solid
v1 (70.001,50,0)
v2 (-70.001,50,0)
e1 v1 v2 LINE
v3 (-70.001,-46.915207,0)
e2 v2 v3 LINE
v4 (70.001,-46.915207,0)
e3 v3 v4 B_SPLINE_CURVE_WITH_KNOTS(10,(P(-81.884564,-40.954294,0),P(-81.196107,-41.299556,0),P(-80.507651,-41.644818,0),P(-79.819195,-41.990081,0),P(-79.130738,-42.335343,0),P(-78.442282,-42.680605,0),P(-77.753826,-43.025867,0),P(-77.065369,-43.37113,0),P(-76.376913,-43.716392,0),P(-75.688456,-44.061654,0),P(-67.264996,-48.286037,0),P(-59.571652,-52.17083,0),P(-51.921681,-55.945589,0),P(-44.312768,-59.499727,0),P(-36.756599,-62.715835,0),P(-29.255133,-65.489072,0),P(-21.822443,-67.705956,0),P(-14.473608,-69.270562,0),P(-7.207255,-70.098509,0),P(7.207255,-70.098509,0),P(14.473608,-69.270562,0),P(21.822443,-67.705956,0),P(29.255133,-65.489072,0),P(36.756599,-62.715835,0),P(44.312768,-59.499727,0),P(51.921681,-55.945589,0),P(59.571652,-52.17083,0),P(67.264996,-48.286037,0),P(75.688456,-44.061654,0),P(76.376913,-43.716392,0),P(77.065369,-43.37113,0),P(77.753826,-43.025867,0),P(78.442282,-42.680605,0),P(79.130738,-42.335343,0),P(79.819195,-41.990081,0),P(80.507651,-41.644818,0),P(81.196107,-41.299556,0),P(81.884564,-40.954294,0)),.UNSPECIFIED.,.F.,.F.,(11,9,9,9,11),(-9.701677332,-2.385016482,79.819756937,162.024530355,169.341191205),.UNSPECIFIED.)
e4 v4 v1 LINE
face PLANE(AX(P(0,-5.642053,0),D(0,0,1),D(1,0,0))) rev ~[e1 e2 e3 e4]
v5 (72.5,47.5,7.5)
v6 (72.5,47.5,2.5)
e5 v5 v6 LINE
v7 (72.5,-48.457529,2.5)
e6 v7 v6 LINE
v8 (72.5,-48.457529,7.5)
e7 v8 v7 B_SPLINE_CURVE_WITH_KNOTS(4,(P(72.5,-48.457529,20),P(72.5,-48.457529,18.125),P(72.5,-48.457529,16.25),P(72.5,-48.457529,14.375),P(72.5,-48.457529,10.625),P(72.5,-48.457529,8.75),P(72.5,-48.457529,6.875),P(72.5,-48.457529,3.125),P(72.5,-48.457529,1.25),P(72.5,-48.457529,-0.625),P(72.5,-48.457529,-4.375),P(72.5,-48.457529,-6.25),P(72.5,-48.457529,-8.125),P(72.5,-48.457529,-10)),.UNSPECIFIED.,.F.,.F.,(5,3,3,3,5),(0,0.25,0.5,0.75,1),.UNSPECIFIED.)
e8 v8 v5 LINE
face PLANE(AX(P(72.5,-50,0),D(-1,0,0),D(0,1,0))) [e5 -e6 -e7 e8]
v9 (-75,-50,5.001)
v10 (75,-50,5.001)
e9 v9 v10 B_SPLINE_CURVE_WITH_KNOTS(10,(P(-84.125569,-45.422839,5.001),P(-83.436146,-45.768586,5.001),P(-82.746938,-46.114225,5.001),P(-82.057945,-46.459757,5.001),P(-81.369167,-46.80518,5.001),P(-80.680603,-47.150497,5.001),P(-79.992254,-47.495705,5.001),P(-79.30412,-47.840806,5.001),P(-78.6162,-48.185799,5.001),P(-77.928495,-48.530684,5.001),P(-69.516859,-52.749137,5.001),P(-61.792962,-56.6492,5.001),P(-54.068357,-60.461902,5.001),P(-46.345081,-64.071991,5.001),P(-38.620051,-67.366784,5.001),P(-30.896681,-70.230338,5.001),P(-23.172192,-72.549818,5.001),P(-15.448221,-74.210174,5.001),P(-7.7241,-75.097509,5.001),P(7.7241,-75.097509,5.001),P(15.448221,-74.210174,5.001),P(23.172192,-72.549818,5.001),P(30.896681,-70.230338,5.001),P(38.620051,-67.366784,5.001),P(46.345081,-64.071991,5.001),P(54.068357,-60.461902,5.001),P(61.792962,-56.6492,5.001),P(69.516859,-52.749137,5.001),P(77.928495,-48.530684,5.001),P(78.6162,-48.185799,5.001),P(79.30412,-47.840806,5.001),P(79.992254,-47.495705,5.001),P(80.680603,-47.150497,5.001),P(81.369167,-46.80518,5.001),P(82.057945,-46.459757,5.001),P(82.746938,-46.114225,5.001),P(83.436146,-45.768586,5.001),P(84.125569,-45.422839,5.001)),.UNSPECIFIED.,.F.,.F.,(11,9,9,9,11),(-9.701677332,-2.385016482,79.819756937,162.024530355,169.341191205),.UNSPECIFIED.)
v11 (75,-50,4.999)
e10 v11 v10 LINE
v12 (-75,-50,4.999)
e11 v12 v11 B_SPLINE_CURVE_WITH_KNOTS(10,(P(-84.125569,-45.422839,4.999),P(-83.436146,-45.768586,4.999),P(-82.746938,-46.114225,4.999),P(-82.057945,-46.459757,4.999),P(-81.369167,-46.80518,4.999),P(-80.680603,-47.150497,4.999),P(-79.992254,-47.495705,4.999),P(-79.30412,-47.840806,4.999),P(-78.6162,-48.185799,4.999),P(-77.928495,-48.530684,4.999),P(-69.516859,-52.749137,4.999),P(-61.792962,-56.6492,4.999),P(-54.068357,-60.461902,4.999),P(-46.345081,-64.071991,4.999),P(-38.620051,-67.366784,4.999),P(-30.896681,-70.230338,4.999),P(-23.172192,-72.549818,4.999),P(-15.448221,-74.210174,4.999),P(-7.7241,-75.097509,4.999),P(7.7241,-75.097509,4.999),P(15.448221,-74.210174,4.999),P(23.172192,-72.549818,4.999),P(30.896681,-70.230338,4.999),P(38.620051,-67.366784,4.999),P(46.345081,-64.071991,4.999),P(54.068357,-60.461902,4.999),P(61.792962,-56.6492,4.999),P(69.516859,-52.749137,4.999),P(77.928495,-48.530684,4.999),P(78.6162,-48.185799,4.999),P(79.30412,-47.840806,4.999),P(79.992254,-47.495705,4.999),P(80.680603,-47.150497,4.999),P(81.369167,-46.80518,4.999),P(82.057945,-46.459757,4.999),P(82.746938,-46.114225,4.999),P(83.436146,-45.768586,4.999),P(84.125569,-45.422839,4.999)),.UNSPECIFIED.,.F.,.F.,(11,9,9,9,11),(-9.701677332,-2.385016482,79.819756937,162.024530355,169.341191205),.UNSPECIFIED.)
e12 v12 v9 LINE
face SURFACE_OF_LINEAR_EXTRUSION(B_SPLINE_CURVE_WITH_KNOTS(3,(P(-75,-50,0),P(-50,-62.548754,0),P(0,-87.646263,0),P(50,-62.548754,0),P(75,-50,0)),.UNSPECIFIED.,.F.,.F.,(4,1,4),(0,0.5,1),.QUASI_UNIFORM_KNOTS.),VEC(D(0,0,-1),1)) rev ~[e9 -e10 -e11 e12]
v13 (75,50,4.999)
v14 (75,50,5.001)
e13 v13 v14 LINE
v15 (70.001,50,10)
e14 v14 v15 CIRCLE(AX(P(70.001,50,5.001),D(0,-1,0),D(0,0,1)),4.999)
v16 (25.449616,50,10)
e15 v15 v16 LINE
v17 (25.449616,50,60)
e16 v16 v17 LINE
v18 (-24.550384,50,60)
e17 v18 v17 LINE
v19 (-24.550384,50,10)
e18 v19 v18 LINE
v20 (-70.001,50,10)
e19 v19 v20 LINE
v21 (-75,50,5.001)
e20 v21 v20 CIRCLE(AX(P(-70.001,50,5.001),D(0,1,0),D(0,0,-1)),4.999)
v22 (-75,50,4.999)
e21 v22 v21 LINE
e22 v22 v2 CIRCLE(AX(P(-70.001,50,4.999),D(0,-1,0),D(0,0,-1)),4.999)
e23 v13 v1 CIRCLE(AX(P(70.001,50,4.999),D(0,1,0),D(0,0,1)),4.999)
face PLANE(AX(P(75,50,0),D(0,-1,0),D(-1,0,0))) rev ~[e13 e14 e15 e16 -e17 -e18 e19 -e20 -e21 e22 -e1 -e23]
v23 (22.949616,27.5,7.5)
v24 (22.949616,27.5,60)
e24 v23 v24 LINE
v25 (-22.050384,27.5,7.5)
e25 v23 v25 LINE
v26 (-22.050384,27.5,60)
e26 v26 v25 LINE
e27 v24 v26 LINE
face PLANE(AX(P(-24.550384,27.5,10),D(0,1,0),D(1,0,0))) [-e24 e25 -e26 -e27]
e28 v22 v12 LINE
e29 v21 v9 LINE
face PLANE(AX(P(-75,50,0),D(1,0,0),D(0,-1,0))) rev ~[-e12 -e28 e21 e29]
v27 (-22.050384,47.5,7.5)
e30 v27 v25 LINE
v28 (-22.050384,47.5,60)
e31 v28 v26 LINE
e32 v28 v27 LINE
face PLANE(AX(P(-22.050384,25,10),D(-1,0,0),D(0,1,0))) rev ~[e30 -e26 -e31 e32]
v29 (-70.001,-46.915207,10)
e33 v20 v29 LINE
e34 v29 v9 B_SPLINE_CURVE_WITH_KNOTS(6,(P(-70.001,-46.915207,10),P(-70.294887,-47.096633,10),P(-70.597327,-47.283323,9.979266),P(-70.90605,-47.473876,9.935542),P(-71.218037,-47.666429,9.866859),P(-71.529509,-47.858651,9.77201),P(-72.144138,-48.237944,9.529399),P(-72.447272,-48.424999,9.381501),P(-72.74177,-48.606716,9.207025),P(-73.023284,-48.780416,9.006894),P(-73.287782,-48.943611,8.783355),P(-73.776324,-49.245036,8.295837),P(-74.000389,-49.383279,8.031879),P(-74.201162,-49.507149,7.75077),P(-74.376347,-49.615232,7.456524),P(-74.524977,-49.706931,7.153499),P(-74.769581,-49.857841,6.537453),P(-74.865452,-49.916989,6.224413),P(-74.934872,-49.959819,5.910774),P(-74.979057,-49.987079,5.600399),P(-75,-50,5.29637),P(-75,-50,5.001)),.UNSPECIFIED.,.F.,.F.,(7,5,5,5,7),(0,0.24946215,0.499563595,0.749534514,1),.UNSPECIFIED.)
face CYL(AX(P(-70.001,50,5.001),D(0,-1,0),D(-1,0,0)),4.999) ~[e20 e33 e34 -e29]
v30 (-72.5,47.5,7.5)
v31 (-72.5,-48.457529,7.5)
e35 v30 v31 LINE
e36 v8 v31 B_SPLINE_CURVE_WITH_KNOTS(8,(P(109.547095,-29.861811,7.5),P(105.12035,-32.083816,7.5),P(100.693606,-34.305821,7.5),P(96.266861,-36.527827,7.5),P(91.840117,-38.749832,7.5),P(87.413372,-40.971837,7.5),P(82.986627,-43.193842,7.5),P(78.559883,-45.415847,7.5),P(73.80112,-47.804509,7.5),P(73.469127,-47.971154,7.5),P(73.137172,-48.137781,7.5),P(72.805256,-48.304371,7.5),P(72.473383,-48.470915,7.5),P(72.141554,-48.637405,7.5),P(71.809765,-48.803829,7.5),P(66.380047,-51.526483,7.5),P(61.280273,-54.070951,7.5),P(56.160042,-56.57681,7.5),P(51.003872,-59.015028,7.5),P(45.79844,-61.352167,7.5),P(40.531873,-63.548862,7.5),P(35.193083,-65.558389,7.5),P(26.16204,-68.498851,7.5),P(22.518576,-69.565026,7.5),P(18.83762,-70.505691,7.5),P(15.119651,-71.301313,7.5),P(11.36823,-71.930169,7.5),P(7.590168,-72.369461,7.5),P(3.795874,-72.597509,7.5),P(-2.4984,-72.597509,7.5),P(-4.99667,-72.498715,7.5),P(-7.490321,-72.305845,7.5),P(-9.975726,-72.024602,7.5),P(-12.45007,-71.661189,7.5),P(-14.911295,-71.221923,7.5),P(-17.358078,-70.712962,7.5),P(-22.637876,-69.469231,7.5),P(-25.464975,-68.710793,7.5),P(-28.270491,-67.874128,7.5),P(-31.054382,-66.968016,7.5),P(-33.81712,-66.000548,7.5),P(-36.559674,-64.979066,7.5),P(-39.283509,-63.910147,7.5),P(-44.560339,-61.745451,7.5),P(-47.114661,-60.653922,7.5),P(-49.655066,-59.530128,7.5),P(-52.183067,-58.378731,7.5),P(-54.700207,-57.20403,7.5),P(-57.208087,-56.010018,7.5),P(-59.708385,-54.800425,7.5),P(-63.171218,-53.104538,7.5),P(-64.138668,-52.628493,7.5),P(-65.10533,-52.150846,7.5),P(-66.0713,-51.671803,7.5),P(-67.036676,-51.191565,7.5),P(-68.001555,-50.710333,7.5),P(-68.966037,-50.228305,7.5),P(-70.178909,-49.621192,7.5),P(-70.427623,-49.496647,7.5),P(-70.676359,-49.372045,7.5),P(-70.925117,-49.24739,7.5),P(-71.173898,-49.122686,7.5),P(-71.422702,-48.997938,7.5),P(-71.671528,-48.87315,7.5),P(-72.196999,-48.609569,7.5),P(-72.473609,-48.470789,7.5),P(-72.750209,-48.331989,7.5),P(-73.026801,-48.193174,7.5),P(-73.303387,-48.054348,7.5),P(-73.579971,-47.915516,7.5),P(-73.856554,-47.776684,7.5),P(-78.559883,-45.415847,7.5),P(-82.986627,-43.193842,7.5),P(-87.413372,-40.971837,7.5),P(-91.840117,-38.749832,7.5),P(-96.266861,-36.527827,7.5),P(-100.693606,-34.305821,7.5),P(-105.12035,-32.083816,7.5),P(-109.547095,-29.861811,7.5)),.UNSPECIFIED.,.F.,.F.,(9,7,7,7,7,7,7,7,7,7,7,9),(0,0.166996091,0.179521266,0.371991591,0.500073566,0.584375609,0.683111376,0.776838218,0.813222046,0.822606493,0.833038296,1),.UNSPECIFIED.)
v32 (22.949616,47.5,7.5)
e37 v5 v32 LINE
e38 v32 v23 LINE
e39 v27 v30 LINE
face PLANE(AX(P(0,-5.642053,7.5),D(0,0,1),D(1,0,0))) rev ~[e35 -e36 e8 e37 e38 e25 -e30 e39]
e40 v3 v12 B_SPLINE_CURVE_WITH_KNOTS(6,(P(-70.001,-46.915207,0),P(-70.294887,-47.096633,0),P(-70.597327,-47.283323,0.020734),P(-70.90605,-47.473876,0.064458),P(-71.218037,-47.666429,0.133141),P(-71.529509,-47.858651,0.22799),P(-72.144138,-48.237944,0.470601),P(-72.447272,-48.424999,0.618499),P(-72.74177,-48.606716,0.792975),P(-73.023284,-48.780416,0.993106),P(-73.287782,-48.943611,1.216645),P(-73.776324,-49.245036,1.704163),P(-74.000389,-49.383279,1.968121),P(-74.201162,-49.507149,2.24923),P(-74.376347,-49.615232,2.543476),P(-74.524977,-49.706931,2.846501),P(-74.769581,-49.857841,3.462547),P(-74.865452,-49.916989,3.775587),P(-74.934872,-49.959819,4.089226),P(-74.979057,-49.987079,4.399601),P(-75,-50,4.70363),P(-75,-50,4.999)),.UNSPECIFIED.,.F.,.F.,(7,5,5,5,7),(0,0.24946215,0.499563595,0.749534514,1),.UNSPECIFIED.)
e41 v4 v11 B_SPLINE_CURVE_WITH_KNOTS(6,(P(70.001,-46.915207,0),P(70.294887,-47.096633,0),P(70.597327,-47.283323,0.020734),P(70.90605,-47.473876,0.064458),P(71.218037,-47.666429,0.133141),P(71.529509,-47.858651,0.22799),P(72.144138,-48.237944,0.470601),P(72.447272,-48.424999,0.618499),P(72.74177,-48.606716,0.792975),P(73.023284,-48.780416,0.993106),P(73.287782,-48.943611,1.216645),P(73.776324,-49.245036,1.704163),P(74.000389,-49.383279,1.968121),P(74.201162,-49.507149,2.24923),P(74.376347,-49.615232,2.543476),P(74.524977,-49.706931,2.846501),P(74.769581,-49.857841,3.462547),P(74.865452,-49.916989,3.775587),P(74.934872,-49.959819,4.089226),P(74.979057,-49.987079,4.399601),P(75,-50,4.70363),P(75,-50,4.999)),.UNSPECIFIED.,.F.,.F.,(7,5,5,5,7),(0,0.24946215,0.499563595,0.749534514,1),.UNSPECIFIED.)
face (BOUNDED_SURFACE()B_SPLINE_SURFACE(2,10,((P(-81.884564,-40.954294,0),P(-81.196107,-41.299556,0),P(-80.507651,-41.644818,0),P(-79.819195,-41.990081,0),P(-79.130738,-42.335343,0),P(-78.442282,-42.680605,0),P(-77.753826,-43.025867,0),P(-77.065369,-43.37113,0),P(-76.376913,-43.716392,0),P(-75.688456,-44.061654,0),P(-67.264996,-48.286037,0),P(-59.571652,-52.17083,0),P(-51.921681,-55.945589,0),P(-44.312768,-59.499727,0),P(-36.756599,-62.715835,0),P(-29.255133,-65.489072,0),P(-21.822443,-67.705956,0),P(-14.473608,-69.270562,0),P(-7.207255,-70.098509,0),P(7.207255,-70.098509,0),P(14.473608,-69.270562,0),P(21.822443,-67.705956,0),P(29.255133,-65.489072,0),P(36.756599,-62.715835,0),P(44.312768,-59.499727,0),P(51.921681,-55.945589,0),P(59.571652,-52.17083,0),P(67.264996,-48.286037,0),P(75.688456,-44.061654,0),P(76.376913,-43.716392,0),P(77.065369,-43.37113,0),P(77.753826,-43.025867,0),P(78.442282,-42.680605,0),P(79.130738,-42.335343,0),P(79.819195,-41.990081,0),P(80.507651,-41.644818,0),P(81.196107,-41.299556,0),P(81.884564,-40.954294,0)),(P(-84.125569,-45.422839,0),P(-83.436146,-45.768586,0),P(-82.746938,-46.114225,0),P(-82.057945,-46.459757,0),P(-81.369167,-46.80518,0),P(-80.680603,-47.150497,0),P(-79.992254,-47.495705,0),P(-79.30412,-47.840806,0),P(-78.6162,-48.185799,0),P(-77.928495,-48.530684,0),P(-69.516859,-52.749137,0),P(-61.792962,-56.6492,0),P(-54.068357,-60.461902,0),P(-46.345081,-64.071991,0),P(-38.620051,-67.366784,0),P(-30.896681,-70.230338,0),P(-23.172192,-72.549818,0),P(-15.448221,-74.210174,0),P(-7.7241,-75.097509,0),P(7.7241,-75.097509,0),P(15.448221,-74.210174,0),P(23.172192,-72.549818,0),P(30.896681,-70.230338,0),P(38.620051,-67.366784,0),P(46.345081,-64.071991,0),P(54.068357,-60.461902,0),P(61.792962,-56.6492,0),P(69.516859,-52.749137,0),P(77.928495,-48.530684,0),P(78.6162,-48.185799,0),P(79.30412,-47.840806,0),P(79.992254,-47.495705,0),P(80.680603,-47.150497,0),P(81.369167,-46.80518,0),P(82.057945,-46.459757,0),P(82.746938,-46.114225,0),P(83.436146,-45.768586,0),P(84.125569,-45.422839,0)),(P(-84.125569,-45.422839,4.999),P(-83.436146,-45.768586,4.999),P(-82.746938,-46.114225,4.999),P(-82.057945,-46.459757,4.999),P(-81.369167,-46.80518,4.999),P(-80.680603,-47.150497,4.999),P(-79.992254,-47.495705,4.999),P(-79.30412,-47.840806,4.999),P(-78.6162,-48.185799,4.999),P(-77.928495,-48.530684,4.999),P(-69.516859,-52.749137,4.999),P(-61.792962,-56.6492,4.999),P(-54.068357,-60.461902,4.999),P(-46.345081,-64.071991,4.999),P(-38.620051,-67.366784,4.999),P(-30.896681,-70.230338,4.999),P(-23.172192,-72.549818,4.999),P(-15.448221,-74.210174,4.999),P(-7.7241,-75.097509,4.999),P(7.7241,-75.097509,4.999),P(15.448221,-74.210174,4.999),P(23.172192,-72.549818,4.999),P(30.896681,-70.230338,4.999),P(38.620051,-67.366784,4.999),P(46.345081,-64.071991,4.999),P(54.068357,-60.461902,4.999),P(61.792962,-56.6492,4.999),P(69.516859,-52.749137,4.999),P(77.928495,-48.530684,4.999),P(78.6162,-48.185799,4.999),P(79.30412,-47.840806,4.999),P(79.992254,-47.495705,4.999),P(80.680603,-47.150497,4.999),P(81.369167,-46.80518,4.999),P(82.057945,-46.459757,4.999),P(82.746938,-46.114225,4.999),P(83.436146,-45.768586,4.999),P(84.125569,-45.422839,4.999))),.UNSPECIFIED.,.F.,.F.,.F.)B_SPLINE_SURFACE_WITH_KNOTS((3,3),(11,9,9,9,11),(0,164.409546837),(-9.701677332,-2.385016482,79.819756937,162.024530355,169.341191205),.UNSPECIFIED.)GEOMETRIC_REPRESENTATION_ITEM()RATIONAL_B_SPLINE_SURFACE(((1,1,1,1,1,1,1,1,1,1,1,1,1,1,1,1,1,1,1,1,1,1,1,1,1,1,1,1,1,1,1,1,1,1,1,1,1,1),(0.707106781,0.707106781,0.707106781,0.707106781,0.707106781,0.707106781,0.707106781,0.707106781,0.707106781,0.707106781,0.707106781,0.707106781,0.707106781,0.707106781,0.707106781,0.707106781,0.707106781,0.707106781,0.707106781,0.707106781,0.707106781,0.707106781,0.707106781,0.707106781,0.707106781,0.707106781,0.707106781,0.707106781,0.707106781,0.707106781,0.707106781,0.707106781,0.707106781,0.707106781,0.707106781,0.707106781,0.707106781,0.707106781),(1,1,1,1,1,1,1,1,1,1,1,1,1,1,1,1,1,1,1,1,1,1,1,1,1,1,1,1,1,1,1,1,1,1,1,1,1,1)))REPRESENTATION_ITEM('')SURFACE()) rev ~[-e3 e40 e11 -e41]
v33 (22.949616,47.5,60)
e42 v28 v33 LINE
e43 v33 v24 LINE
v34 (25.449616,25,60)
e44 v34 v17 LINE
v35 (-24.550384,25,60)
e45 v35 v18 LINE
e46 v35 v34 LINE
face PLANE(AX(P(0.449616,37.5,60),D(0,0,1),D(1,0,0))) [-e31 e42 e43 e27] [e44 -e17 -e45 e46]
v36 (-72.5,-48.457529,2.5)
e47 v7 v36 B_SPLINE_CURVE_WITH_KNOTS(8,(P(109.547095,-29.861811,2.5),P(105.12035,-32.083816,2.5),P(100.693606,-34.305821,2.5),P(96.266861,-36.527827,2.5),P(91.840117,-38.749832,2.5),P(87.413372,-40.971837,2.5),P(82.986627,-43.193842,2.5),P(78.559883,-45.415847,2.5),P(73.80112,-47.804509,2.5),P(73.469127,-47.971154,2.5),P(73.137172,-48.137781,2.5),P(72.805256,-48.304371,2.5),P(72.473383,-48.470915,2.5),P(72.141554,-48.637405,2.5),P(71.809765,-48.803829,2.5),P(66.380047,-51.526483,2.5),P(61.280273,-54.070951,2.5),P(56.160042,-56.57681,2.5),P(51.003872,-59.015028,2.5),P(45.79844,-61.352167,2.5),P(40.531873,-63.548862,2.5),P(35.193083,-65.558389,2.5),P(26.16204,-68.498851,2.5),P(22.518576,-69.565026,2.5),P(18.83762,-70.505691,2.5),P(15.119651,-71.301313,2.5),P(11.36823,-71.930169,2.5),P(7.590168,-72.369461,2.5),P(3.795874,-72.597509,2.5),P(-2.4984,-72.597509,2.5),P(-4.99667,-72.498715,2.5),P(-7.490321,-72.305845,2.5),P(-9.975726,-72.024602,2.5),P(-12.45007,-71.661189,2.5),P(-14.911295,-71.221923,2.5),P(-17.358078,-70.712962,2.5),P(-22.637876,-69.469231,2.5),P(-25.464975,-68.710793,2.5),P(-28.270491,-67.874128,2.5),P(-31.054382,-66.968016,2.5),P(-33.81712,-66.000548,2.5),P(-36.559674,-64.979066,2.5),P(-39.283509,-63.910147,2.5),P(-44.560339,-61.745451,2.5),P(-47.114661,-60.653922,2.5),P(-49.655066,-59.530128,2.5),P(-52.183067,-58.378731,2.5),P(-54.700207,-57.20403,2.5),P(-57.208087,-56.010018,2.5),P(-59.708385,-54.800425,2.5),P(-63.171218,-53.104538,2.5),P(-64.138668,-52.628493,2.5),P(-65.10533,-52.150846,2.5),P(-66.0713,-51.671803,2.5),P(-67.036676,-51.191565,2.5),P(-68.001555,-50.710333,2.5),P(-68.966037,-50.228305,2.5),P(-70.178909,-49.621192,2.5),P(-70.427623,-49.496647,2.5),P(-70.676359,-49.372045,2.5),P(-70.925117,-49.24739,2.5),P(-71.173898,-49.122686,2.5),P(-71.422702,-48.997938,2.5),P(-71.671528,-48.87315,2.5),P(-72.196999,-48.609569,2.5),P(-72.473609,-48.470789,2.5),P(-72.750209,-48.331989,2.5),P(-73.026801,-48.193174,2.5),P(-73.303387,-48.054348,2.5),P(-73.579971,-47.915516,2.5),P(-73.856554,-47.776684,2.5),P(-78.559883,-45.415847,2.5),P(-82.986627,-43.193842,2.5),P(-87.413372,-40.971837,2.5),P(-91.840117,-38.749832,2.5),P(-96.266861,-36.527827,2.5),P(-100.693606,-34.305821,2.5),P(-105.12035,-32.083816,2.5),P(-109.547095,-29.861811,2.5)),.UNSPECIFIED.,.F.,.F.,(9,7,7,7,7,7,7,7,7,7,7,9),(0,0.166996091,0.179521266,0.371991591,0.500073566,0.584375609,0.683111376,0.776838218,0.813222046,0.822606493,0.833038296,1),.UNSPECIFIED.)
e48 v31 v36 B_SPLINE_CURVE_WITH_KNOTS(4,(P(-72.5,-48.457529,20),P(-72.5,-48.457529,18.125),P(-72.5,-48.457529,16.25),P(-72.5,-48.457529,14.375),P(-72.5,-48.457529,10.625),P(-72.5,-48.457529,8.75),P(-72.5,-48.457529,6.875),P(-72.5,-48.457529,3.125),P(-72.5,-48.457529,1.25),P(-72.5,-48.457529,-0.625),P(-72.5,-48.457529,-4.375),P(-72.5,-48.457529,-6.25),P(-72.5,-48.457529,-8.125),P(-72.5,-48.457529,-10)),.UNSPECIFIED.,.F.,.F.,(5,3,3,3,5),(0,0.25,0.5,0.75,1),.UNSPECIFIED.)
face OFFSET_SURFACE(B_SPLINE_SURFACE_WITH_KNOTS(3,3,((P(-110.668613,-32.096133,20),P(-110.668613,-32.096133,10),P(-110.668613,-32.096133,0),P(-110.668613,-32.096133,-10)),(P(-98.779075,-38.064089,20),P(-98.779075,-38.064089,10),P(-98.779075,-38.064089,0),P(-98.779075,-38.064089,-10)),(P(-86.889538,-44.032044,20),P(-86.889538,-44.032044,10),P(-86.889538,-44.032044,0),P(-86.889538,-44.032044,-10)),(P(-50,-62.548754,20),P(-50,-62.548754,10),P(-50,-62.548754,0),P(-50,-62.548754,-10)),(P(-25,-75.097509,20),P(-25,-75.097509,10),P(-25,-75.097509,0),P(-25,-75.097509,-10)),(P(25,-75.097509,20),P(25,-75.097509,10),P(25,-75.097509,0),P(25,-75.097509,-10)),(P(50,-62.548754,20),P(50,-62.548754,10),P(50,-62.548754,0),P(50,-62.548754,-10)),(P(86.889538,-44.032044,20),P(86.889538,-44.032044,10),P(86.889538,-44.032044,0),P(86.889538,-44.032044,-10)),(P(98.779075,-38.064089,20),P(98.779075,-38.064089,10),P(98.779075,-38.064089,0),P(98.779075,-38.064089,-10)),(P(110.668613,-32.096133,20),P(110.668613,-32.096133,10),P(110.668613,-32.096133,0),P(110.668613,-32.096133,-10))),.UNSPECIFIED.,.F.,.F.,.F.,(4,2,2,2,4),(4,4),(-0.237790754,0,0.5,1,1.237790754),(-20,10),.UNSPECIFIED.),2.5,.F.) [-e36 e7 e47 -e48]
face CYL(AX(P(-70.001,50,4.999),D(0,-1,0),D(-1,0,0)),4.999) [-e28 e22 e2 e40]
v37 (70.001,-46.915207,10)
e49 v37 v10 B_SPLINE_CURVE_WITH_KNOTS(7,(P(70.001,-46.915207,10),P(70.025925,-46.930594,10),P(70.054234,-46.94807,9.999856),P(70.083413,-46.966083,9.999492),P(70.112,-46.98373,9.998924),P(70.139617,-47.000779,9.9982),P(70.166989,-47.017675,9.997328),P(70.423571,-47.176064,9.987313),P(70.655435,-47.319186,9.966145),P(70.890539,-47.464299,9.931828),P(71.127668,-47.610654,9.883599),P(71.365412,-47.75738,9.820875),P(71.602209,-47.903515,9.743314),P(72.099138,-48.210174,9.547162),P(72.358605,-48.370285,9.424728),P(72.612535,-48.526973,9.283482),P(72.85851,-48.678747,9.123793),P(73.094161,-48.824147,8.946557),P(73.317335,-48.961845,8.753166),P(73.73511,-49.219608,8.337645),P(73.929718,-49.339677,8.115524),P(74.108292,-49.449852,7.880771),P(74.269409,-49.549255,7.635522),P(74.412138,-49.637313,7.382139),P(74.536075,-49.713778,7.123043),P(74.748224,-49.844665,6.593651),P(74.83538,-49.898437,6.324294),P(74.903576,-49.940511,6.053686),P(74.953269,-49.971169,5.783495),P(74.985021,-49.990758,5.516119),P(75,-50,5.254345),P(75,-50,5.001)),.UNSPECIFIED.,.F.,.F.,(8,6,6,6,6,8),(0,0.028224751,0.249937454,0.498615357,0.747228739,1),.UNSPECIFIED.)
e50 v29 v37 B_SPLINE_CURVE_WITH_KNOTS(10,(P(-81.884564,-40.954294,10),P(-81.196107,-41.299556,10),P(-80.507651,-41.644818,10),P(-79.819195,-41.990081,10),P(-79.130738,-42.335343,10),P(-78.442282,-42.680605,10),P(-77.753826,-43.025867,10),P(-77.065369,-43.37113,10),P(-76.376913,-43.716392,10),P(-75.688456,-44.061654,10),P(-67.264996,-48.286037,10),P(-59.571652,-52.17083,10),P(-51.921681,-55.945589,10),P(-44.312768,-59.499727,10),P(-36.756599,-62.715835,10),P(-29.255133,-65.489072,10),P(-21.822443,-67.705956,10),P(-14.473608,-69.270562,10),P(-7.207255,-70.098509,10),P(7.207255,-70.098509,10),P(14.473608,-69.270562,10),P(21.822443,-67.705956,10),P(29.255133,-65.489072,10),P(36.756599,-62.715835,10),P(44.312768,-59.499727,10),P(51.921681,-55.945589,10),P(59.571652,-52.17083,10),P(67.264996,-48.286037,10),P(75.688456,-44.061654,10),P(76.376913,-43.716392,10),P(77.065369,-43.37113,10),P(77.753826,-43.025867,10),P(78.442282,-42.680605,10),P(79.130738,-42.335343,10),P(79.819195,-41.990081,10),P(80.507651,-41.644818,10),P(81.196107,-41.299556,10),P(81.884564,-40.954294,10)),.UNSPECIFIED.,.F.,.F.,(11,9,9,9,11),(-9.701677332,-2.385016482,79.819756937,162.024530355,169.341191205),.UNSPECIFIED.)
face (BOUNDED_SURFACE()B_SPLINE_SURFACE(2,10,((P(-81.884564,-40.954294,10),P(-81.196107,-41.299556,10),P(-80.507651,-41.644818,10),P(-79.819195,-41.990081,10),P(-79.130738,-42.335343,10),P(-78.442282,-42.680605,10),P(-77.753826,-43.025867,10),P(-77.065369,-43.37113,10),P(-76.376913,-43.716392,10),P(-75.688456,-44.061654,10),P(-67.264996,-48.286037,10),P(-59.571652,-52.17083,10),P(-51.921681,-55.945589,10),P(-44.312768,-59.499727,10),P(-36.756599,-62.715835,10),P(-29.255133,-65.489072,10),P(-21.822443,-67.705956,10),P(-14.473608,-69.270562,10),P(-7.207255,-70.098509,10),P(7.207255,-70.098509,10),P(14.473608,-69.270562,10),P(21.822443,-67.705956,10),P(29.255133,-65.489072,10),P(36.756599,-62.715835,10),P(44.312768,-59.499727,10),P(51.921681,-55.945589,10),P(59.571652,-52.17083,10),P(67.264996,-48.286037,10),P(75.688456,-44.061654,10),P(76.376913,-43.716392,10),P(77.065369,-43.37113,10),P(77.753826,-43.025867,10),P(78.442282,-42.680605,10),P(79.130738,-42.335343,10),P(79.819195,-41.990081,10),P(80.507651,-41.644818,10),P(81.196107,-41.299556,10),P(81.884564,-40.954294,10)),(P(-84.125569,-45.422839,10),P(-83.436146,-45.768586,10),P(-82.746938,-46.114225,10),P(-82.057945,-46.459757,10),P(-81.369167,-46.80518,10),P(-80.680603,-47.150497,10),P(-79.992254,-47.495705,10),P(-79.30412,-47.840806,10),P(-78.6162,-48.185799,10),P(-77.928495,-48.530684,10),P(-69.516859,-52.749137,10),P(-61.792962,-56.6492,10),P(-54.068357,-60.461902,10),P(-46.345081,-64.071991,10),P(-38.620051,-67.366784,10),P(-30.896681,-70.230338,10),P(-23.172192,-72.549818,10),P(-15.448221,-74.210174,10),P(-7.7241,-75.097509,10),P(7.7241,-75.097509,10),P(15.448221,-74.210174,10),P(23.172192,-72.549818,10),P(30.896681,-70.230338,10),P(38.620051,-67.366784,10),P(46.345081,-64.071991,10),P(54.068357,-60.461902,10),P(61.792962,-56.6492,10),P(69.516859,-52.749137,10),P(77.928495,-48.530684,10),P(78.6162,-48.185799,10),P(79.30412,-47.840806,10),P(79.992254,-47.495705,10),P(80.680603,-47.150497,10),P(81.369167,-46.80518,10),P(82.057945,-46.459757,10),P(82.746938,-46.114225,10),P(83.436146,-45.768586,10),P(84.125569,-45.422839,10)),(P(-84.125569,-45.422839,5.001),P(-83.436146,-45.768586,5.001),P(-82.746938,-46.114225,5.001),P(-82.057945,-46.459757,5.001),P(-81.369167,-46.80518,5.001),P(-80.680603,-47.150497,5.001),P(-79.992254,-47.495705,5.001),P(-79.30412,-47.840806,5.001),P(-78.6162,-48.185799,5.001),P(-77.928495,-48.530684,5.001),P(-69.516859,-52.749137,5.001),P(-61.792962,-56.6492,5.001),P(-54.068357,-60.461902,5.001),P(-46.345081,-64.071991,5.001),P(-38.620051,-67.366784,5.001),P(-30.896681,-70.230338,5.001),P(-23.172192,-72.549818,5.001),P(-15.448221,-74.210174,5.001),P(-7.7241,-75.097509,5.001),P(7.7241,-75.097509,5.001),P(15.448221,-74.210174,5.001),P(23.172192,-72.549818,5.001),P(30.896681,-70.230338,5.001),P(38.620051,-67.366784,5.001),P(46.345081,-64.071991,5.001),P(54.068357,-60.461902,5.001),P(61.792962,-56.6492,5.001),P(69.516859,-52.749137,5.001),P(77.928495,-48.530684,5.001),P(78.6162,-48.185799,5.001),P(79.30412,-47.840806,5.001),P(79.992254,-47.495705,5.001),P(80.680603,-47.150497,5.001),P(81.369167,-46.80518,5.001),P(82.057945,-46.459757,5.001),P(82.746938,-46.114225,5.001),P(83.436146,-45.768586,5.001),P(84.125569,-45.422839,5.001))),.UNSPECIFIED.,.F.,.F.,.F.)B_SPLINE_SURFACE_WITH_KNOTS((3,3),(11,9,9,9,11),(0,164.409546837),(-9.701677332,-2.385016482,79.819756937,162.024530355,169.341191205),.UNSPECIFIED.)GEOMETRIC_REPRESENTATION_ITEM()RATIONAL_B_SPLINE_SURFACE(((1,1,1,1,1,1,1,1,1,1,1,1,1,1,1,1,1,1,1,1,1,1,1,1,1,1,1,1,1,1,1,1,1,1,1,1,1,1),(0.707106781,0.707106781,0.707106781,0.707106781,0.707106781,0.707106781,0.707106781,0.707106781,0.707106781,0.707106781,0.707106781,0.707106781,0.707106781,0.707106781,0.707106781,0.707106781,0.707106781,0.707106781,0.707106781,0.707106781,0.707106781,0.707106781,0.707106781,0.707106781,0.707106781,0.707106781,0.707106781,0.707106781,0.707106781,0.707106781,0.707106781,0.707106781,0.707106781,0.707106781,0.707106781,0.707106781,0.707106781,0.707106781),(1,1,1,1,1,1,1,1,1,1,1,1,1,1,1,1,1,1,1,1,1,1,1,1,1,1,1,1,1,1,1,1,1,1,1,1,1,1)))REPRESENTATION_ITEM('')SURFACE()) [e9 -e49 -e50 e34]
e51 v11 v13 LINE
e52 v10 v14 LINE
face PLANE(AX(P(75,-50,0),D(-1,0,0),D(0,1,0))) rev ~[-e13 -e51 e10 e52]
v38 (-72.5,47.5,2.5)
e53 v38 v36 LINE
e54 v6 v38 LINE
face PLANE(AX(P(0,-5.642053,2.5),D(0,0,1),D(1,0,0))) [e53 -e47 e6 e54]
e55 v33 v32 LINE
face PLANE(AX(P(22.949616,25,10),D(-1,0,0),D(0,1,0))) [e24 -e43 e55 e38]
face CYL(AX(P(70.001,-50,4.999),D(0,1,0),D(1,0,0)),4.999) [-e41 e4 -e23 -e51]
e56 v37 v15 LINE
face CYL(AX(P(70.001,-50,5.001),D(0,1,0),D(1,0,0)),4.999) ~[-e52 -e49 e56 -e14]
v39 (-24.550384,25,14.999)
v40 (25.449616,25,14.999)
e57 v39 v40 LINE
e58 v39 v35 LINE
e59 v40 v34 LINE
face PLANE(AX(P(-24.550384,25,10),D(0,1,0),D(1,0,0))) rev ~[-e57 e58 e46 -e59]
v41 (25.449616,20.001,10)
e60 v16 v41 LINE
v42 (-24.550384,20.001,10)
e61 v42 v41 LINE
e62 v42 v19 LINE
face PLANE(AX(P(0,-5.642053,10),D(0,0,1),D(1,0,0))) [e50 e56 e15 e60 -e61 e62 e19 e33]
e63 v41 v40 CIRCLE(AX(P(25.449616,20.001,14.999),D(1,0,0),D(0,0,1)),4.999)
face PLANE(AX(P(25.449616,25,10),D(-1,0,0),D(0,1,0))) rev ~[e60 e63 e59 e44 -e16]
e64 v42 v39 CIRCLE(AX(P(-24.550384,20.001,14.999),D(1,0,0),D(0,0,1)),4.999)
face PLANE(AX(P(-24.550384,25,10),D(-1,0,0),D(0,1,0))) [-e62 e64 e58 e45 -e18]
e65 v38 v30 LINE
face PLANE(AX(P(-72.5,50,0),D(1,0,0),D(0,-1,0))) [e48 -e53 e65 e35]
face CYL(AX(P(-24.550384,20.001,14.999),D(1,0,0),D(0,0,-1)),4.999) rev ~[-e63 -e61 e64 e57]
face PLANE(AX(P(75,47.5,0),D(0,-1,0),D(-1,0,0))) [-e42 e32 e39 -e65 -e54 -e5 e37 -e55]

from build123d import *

# Parameters (mm, degrees)
F1_DEPTH = 10
F2_W     = 50
F2_H     = 25
F3_DEPTH = 50
F4_T     = -2.5
F5_R     = 4.999


# Not quite as in the source:
# - a fillet or chamfer is up to 0.001 mm smaller than in the source, because OpenCascade refuses the exact size


with BuildPart() as f1:
    # F0 (on Top) → F1 (new body)
    with BuildSketch(Plane.XY):
        with BuildLine():
            Line((75, 50), (-75, 50))
            Line((-75, 50), (-75, -50))
            add(Edge.make_bspline(
                [(-75, -50), (-50, -62.5487543643), (0, -87.6462630928), (50, -62.5487543643), (75, -50)],
                knots=[0, 0, 0, 0, 0.5, 1, 1, 1, 1], degree=3))
            Line((75, -50), (75, 50))
        make_face()
    extrude(amount=F1_DEPTH)

    # F2 (on face) → F3 (join)
    with BuildSketch(Plane.XY.offset(10)):
        with Locations((0.4496160895, 37.5)):
            Rectangle(F2_W, F2_H)
    extrude(amount=F3_DEPTH)

    # F4
    f4_openings = [f1.faces().sort_by_distance(p)[0] for p in [
        (0.449616, 37.5, 60),
    ]]
    offset(amount=F4_T, openings=f4_openings, kind=Kind.INTERSECTION)

    # F5 (radius 5 in the source; OpenCascade refuses exactly that, so slightly less here)
    f5_edges = [f1.edges().sort_by_distance(p)[0] for p in [
        (0, -75.097509, 10),
        (0, -75.097509, 0),
        (-75, 0, 10),
        (-75, 0, 0),
        (75, 0, 0),
        (75, 0, 10),
        (0.449616, 25, 10),
    ]]
    fillet(f5_edges, radius=F5_R)


solid = f1.part
